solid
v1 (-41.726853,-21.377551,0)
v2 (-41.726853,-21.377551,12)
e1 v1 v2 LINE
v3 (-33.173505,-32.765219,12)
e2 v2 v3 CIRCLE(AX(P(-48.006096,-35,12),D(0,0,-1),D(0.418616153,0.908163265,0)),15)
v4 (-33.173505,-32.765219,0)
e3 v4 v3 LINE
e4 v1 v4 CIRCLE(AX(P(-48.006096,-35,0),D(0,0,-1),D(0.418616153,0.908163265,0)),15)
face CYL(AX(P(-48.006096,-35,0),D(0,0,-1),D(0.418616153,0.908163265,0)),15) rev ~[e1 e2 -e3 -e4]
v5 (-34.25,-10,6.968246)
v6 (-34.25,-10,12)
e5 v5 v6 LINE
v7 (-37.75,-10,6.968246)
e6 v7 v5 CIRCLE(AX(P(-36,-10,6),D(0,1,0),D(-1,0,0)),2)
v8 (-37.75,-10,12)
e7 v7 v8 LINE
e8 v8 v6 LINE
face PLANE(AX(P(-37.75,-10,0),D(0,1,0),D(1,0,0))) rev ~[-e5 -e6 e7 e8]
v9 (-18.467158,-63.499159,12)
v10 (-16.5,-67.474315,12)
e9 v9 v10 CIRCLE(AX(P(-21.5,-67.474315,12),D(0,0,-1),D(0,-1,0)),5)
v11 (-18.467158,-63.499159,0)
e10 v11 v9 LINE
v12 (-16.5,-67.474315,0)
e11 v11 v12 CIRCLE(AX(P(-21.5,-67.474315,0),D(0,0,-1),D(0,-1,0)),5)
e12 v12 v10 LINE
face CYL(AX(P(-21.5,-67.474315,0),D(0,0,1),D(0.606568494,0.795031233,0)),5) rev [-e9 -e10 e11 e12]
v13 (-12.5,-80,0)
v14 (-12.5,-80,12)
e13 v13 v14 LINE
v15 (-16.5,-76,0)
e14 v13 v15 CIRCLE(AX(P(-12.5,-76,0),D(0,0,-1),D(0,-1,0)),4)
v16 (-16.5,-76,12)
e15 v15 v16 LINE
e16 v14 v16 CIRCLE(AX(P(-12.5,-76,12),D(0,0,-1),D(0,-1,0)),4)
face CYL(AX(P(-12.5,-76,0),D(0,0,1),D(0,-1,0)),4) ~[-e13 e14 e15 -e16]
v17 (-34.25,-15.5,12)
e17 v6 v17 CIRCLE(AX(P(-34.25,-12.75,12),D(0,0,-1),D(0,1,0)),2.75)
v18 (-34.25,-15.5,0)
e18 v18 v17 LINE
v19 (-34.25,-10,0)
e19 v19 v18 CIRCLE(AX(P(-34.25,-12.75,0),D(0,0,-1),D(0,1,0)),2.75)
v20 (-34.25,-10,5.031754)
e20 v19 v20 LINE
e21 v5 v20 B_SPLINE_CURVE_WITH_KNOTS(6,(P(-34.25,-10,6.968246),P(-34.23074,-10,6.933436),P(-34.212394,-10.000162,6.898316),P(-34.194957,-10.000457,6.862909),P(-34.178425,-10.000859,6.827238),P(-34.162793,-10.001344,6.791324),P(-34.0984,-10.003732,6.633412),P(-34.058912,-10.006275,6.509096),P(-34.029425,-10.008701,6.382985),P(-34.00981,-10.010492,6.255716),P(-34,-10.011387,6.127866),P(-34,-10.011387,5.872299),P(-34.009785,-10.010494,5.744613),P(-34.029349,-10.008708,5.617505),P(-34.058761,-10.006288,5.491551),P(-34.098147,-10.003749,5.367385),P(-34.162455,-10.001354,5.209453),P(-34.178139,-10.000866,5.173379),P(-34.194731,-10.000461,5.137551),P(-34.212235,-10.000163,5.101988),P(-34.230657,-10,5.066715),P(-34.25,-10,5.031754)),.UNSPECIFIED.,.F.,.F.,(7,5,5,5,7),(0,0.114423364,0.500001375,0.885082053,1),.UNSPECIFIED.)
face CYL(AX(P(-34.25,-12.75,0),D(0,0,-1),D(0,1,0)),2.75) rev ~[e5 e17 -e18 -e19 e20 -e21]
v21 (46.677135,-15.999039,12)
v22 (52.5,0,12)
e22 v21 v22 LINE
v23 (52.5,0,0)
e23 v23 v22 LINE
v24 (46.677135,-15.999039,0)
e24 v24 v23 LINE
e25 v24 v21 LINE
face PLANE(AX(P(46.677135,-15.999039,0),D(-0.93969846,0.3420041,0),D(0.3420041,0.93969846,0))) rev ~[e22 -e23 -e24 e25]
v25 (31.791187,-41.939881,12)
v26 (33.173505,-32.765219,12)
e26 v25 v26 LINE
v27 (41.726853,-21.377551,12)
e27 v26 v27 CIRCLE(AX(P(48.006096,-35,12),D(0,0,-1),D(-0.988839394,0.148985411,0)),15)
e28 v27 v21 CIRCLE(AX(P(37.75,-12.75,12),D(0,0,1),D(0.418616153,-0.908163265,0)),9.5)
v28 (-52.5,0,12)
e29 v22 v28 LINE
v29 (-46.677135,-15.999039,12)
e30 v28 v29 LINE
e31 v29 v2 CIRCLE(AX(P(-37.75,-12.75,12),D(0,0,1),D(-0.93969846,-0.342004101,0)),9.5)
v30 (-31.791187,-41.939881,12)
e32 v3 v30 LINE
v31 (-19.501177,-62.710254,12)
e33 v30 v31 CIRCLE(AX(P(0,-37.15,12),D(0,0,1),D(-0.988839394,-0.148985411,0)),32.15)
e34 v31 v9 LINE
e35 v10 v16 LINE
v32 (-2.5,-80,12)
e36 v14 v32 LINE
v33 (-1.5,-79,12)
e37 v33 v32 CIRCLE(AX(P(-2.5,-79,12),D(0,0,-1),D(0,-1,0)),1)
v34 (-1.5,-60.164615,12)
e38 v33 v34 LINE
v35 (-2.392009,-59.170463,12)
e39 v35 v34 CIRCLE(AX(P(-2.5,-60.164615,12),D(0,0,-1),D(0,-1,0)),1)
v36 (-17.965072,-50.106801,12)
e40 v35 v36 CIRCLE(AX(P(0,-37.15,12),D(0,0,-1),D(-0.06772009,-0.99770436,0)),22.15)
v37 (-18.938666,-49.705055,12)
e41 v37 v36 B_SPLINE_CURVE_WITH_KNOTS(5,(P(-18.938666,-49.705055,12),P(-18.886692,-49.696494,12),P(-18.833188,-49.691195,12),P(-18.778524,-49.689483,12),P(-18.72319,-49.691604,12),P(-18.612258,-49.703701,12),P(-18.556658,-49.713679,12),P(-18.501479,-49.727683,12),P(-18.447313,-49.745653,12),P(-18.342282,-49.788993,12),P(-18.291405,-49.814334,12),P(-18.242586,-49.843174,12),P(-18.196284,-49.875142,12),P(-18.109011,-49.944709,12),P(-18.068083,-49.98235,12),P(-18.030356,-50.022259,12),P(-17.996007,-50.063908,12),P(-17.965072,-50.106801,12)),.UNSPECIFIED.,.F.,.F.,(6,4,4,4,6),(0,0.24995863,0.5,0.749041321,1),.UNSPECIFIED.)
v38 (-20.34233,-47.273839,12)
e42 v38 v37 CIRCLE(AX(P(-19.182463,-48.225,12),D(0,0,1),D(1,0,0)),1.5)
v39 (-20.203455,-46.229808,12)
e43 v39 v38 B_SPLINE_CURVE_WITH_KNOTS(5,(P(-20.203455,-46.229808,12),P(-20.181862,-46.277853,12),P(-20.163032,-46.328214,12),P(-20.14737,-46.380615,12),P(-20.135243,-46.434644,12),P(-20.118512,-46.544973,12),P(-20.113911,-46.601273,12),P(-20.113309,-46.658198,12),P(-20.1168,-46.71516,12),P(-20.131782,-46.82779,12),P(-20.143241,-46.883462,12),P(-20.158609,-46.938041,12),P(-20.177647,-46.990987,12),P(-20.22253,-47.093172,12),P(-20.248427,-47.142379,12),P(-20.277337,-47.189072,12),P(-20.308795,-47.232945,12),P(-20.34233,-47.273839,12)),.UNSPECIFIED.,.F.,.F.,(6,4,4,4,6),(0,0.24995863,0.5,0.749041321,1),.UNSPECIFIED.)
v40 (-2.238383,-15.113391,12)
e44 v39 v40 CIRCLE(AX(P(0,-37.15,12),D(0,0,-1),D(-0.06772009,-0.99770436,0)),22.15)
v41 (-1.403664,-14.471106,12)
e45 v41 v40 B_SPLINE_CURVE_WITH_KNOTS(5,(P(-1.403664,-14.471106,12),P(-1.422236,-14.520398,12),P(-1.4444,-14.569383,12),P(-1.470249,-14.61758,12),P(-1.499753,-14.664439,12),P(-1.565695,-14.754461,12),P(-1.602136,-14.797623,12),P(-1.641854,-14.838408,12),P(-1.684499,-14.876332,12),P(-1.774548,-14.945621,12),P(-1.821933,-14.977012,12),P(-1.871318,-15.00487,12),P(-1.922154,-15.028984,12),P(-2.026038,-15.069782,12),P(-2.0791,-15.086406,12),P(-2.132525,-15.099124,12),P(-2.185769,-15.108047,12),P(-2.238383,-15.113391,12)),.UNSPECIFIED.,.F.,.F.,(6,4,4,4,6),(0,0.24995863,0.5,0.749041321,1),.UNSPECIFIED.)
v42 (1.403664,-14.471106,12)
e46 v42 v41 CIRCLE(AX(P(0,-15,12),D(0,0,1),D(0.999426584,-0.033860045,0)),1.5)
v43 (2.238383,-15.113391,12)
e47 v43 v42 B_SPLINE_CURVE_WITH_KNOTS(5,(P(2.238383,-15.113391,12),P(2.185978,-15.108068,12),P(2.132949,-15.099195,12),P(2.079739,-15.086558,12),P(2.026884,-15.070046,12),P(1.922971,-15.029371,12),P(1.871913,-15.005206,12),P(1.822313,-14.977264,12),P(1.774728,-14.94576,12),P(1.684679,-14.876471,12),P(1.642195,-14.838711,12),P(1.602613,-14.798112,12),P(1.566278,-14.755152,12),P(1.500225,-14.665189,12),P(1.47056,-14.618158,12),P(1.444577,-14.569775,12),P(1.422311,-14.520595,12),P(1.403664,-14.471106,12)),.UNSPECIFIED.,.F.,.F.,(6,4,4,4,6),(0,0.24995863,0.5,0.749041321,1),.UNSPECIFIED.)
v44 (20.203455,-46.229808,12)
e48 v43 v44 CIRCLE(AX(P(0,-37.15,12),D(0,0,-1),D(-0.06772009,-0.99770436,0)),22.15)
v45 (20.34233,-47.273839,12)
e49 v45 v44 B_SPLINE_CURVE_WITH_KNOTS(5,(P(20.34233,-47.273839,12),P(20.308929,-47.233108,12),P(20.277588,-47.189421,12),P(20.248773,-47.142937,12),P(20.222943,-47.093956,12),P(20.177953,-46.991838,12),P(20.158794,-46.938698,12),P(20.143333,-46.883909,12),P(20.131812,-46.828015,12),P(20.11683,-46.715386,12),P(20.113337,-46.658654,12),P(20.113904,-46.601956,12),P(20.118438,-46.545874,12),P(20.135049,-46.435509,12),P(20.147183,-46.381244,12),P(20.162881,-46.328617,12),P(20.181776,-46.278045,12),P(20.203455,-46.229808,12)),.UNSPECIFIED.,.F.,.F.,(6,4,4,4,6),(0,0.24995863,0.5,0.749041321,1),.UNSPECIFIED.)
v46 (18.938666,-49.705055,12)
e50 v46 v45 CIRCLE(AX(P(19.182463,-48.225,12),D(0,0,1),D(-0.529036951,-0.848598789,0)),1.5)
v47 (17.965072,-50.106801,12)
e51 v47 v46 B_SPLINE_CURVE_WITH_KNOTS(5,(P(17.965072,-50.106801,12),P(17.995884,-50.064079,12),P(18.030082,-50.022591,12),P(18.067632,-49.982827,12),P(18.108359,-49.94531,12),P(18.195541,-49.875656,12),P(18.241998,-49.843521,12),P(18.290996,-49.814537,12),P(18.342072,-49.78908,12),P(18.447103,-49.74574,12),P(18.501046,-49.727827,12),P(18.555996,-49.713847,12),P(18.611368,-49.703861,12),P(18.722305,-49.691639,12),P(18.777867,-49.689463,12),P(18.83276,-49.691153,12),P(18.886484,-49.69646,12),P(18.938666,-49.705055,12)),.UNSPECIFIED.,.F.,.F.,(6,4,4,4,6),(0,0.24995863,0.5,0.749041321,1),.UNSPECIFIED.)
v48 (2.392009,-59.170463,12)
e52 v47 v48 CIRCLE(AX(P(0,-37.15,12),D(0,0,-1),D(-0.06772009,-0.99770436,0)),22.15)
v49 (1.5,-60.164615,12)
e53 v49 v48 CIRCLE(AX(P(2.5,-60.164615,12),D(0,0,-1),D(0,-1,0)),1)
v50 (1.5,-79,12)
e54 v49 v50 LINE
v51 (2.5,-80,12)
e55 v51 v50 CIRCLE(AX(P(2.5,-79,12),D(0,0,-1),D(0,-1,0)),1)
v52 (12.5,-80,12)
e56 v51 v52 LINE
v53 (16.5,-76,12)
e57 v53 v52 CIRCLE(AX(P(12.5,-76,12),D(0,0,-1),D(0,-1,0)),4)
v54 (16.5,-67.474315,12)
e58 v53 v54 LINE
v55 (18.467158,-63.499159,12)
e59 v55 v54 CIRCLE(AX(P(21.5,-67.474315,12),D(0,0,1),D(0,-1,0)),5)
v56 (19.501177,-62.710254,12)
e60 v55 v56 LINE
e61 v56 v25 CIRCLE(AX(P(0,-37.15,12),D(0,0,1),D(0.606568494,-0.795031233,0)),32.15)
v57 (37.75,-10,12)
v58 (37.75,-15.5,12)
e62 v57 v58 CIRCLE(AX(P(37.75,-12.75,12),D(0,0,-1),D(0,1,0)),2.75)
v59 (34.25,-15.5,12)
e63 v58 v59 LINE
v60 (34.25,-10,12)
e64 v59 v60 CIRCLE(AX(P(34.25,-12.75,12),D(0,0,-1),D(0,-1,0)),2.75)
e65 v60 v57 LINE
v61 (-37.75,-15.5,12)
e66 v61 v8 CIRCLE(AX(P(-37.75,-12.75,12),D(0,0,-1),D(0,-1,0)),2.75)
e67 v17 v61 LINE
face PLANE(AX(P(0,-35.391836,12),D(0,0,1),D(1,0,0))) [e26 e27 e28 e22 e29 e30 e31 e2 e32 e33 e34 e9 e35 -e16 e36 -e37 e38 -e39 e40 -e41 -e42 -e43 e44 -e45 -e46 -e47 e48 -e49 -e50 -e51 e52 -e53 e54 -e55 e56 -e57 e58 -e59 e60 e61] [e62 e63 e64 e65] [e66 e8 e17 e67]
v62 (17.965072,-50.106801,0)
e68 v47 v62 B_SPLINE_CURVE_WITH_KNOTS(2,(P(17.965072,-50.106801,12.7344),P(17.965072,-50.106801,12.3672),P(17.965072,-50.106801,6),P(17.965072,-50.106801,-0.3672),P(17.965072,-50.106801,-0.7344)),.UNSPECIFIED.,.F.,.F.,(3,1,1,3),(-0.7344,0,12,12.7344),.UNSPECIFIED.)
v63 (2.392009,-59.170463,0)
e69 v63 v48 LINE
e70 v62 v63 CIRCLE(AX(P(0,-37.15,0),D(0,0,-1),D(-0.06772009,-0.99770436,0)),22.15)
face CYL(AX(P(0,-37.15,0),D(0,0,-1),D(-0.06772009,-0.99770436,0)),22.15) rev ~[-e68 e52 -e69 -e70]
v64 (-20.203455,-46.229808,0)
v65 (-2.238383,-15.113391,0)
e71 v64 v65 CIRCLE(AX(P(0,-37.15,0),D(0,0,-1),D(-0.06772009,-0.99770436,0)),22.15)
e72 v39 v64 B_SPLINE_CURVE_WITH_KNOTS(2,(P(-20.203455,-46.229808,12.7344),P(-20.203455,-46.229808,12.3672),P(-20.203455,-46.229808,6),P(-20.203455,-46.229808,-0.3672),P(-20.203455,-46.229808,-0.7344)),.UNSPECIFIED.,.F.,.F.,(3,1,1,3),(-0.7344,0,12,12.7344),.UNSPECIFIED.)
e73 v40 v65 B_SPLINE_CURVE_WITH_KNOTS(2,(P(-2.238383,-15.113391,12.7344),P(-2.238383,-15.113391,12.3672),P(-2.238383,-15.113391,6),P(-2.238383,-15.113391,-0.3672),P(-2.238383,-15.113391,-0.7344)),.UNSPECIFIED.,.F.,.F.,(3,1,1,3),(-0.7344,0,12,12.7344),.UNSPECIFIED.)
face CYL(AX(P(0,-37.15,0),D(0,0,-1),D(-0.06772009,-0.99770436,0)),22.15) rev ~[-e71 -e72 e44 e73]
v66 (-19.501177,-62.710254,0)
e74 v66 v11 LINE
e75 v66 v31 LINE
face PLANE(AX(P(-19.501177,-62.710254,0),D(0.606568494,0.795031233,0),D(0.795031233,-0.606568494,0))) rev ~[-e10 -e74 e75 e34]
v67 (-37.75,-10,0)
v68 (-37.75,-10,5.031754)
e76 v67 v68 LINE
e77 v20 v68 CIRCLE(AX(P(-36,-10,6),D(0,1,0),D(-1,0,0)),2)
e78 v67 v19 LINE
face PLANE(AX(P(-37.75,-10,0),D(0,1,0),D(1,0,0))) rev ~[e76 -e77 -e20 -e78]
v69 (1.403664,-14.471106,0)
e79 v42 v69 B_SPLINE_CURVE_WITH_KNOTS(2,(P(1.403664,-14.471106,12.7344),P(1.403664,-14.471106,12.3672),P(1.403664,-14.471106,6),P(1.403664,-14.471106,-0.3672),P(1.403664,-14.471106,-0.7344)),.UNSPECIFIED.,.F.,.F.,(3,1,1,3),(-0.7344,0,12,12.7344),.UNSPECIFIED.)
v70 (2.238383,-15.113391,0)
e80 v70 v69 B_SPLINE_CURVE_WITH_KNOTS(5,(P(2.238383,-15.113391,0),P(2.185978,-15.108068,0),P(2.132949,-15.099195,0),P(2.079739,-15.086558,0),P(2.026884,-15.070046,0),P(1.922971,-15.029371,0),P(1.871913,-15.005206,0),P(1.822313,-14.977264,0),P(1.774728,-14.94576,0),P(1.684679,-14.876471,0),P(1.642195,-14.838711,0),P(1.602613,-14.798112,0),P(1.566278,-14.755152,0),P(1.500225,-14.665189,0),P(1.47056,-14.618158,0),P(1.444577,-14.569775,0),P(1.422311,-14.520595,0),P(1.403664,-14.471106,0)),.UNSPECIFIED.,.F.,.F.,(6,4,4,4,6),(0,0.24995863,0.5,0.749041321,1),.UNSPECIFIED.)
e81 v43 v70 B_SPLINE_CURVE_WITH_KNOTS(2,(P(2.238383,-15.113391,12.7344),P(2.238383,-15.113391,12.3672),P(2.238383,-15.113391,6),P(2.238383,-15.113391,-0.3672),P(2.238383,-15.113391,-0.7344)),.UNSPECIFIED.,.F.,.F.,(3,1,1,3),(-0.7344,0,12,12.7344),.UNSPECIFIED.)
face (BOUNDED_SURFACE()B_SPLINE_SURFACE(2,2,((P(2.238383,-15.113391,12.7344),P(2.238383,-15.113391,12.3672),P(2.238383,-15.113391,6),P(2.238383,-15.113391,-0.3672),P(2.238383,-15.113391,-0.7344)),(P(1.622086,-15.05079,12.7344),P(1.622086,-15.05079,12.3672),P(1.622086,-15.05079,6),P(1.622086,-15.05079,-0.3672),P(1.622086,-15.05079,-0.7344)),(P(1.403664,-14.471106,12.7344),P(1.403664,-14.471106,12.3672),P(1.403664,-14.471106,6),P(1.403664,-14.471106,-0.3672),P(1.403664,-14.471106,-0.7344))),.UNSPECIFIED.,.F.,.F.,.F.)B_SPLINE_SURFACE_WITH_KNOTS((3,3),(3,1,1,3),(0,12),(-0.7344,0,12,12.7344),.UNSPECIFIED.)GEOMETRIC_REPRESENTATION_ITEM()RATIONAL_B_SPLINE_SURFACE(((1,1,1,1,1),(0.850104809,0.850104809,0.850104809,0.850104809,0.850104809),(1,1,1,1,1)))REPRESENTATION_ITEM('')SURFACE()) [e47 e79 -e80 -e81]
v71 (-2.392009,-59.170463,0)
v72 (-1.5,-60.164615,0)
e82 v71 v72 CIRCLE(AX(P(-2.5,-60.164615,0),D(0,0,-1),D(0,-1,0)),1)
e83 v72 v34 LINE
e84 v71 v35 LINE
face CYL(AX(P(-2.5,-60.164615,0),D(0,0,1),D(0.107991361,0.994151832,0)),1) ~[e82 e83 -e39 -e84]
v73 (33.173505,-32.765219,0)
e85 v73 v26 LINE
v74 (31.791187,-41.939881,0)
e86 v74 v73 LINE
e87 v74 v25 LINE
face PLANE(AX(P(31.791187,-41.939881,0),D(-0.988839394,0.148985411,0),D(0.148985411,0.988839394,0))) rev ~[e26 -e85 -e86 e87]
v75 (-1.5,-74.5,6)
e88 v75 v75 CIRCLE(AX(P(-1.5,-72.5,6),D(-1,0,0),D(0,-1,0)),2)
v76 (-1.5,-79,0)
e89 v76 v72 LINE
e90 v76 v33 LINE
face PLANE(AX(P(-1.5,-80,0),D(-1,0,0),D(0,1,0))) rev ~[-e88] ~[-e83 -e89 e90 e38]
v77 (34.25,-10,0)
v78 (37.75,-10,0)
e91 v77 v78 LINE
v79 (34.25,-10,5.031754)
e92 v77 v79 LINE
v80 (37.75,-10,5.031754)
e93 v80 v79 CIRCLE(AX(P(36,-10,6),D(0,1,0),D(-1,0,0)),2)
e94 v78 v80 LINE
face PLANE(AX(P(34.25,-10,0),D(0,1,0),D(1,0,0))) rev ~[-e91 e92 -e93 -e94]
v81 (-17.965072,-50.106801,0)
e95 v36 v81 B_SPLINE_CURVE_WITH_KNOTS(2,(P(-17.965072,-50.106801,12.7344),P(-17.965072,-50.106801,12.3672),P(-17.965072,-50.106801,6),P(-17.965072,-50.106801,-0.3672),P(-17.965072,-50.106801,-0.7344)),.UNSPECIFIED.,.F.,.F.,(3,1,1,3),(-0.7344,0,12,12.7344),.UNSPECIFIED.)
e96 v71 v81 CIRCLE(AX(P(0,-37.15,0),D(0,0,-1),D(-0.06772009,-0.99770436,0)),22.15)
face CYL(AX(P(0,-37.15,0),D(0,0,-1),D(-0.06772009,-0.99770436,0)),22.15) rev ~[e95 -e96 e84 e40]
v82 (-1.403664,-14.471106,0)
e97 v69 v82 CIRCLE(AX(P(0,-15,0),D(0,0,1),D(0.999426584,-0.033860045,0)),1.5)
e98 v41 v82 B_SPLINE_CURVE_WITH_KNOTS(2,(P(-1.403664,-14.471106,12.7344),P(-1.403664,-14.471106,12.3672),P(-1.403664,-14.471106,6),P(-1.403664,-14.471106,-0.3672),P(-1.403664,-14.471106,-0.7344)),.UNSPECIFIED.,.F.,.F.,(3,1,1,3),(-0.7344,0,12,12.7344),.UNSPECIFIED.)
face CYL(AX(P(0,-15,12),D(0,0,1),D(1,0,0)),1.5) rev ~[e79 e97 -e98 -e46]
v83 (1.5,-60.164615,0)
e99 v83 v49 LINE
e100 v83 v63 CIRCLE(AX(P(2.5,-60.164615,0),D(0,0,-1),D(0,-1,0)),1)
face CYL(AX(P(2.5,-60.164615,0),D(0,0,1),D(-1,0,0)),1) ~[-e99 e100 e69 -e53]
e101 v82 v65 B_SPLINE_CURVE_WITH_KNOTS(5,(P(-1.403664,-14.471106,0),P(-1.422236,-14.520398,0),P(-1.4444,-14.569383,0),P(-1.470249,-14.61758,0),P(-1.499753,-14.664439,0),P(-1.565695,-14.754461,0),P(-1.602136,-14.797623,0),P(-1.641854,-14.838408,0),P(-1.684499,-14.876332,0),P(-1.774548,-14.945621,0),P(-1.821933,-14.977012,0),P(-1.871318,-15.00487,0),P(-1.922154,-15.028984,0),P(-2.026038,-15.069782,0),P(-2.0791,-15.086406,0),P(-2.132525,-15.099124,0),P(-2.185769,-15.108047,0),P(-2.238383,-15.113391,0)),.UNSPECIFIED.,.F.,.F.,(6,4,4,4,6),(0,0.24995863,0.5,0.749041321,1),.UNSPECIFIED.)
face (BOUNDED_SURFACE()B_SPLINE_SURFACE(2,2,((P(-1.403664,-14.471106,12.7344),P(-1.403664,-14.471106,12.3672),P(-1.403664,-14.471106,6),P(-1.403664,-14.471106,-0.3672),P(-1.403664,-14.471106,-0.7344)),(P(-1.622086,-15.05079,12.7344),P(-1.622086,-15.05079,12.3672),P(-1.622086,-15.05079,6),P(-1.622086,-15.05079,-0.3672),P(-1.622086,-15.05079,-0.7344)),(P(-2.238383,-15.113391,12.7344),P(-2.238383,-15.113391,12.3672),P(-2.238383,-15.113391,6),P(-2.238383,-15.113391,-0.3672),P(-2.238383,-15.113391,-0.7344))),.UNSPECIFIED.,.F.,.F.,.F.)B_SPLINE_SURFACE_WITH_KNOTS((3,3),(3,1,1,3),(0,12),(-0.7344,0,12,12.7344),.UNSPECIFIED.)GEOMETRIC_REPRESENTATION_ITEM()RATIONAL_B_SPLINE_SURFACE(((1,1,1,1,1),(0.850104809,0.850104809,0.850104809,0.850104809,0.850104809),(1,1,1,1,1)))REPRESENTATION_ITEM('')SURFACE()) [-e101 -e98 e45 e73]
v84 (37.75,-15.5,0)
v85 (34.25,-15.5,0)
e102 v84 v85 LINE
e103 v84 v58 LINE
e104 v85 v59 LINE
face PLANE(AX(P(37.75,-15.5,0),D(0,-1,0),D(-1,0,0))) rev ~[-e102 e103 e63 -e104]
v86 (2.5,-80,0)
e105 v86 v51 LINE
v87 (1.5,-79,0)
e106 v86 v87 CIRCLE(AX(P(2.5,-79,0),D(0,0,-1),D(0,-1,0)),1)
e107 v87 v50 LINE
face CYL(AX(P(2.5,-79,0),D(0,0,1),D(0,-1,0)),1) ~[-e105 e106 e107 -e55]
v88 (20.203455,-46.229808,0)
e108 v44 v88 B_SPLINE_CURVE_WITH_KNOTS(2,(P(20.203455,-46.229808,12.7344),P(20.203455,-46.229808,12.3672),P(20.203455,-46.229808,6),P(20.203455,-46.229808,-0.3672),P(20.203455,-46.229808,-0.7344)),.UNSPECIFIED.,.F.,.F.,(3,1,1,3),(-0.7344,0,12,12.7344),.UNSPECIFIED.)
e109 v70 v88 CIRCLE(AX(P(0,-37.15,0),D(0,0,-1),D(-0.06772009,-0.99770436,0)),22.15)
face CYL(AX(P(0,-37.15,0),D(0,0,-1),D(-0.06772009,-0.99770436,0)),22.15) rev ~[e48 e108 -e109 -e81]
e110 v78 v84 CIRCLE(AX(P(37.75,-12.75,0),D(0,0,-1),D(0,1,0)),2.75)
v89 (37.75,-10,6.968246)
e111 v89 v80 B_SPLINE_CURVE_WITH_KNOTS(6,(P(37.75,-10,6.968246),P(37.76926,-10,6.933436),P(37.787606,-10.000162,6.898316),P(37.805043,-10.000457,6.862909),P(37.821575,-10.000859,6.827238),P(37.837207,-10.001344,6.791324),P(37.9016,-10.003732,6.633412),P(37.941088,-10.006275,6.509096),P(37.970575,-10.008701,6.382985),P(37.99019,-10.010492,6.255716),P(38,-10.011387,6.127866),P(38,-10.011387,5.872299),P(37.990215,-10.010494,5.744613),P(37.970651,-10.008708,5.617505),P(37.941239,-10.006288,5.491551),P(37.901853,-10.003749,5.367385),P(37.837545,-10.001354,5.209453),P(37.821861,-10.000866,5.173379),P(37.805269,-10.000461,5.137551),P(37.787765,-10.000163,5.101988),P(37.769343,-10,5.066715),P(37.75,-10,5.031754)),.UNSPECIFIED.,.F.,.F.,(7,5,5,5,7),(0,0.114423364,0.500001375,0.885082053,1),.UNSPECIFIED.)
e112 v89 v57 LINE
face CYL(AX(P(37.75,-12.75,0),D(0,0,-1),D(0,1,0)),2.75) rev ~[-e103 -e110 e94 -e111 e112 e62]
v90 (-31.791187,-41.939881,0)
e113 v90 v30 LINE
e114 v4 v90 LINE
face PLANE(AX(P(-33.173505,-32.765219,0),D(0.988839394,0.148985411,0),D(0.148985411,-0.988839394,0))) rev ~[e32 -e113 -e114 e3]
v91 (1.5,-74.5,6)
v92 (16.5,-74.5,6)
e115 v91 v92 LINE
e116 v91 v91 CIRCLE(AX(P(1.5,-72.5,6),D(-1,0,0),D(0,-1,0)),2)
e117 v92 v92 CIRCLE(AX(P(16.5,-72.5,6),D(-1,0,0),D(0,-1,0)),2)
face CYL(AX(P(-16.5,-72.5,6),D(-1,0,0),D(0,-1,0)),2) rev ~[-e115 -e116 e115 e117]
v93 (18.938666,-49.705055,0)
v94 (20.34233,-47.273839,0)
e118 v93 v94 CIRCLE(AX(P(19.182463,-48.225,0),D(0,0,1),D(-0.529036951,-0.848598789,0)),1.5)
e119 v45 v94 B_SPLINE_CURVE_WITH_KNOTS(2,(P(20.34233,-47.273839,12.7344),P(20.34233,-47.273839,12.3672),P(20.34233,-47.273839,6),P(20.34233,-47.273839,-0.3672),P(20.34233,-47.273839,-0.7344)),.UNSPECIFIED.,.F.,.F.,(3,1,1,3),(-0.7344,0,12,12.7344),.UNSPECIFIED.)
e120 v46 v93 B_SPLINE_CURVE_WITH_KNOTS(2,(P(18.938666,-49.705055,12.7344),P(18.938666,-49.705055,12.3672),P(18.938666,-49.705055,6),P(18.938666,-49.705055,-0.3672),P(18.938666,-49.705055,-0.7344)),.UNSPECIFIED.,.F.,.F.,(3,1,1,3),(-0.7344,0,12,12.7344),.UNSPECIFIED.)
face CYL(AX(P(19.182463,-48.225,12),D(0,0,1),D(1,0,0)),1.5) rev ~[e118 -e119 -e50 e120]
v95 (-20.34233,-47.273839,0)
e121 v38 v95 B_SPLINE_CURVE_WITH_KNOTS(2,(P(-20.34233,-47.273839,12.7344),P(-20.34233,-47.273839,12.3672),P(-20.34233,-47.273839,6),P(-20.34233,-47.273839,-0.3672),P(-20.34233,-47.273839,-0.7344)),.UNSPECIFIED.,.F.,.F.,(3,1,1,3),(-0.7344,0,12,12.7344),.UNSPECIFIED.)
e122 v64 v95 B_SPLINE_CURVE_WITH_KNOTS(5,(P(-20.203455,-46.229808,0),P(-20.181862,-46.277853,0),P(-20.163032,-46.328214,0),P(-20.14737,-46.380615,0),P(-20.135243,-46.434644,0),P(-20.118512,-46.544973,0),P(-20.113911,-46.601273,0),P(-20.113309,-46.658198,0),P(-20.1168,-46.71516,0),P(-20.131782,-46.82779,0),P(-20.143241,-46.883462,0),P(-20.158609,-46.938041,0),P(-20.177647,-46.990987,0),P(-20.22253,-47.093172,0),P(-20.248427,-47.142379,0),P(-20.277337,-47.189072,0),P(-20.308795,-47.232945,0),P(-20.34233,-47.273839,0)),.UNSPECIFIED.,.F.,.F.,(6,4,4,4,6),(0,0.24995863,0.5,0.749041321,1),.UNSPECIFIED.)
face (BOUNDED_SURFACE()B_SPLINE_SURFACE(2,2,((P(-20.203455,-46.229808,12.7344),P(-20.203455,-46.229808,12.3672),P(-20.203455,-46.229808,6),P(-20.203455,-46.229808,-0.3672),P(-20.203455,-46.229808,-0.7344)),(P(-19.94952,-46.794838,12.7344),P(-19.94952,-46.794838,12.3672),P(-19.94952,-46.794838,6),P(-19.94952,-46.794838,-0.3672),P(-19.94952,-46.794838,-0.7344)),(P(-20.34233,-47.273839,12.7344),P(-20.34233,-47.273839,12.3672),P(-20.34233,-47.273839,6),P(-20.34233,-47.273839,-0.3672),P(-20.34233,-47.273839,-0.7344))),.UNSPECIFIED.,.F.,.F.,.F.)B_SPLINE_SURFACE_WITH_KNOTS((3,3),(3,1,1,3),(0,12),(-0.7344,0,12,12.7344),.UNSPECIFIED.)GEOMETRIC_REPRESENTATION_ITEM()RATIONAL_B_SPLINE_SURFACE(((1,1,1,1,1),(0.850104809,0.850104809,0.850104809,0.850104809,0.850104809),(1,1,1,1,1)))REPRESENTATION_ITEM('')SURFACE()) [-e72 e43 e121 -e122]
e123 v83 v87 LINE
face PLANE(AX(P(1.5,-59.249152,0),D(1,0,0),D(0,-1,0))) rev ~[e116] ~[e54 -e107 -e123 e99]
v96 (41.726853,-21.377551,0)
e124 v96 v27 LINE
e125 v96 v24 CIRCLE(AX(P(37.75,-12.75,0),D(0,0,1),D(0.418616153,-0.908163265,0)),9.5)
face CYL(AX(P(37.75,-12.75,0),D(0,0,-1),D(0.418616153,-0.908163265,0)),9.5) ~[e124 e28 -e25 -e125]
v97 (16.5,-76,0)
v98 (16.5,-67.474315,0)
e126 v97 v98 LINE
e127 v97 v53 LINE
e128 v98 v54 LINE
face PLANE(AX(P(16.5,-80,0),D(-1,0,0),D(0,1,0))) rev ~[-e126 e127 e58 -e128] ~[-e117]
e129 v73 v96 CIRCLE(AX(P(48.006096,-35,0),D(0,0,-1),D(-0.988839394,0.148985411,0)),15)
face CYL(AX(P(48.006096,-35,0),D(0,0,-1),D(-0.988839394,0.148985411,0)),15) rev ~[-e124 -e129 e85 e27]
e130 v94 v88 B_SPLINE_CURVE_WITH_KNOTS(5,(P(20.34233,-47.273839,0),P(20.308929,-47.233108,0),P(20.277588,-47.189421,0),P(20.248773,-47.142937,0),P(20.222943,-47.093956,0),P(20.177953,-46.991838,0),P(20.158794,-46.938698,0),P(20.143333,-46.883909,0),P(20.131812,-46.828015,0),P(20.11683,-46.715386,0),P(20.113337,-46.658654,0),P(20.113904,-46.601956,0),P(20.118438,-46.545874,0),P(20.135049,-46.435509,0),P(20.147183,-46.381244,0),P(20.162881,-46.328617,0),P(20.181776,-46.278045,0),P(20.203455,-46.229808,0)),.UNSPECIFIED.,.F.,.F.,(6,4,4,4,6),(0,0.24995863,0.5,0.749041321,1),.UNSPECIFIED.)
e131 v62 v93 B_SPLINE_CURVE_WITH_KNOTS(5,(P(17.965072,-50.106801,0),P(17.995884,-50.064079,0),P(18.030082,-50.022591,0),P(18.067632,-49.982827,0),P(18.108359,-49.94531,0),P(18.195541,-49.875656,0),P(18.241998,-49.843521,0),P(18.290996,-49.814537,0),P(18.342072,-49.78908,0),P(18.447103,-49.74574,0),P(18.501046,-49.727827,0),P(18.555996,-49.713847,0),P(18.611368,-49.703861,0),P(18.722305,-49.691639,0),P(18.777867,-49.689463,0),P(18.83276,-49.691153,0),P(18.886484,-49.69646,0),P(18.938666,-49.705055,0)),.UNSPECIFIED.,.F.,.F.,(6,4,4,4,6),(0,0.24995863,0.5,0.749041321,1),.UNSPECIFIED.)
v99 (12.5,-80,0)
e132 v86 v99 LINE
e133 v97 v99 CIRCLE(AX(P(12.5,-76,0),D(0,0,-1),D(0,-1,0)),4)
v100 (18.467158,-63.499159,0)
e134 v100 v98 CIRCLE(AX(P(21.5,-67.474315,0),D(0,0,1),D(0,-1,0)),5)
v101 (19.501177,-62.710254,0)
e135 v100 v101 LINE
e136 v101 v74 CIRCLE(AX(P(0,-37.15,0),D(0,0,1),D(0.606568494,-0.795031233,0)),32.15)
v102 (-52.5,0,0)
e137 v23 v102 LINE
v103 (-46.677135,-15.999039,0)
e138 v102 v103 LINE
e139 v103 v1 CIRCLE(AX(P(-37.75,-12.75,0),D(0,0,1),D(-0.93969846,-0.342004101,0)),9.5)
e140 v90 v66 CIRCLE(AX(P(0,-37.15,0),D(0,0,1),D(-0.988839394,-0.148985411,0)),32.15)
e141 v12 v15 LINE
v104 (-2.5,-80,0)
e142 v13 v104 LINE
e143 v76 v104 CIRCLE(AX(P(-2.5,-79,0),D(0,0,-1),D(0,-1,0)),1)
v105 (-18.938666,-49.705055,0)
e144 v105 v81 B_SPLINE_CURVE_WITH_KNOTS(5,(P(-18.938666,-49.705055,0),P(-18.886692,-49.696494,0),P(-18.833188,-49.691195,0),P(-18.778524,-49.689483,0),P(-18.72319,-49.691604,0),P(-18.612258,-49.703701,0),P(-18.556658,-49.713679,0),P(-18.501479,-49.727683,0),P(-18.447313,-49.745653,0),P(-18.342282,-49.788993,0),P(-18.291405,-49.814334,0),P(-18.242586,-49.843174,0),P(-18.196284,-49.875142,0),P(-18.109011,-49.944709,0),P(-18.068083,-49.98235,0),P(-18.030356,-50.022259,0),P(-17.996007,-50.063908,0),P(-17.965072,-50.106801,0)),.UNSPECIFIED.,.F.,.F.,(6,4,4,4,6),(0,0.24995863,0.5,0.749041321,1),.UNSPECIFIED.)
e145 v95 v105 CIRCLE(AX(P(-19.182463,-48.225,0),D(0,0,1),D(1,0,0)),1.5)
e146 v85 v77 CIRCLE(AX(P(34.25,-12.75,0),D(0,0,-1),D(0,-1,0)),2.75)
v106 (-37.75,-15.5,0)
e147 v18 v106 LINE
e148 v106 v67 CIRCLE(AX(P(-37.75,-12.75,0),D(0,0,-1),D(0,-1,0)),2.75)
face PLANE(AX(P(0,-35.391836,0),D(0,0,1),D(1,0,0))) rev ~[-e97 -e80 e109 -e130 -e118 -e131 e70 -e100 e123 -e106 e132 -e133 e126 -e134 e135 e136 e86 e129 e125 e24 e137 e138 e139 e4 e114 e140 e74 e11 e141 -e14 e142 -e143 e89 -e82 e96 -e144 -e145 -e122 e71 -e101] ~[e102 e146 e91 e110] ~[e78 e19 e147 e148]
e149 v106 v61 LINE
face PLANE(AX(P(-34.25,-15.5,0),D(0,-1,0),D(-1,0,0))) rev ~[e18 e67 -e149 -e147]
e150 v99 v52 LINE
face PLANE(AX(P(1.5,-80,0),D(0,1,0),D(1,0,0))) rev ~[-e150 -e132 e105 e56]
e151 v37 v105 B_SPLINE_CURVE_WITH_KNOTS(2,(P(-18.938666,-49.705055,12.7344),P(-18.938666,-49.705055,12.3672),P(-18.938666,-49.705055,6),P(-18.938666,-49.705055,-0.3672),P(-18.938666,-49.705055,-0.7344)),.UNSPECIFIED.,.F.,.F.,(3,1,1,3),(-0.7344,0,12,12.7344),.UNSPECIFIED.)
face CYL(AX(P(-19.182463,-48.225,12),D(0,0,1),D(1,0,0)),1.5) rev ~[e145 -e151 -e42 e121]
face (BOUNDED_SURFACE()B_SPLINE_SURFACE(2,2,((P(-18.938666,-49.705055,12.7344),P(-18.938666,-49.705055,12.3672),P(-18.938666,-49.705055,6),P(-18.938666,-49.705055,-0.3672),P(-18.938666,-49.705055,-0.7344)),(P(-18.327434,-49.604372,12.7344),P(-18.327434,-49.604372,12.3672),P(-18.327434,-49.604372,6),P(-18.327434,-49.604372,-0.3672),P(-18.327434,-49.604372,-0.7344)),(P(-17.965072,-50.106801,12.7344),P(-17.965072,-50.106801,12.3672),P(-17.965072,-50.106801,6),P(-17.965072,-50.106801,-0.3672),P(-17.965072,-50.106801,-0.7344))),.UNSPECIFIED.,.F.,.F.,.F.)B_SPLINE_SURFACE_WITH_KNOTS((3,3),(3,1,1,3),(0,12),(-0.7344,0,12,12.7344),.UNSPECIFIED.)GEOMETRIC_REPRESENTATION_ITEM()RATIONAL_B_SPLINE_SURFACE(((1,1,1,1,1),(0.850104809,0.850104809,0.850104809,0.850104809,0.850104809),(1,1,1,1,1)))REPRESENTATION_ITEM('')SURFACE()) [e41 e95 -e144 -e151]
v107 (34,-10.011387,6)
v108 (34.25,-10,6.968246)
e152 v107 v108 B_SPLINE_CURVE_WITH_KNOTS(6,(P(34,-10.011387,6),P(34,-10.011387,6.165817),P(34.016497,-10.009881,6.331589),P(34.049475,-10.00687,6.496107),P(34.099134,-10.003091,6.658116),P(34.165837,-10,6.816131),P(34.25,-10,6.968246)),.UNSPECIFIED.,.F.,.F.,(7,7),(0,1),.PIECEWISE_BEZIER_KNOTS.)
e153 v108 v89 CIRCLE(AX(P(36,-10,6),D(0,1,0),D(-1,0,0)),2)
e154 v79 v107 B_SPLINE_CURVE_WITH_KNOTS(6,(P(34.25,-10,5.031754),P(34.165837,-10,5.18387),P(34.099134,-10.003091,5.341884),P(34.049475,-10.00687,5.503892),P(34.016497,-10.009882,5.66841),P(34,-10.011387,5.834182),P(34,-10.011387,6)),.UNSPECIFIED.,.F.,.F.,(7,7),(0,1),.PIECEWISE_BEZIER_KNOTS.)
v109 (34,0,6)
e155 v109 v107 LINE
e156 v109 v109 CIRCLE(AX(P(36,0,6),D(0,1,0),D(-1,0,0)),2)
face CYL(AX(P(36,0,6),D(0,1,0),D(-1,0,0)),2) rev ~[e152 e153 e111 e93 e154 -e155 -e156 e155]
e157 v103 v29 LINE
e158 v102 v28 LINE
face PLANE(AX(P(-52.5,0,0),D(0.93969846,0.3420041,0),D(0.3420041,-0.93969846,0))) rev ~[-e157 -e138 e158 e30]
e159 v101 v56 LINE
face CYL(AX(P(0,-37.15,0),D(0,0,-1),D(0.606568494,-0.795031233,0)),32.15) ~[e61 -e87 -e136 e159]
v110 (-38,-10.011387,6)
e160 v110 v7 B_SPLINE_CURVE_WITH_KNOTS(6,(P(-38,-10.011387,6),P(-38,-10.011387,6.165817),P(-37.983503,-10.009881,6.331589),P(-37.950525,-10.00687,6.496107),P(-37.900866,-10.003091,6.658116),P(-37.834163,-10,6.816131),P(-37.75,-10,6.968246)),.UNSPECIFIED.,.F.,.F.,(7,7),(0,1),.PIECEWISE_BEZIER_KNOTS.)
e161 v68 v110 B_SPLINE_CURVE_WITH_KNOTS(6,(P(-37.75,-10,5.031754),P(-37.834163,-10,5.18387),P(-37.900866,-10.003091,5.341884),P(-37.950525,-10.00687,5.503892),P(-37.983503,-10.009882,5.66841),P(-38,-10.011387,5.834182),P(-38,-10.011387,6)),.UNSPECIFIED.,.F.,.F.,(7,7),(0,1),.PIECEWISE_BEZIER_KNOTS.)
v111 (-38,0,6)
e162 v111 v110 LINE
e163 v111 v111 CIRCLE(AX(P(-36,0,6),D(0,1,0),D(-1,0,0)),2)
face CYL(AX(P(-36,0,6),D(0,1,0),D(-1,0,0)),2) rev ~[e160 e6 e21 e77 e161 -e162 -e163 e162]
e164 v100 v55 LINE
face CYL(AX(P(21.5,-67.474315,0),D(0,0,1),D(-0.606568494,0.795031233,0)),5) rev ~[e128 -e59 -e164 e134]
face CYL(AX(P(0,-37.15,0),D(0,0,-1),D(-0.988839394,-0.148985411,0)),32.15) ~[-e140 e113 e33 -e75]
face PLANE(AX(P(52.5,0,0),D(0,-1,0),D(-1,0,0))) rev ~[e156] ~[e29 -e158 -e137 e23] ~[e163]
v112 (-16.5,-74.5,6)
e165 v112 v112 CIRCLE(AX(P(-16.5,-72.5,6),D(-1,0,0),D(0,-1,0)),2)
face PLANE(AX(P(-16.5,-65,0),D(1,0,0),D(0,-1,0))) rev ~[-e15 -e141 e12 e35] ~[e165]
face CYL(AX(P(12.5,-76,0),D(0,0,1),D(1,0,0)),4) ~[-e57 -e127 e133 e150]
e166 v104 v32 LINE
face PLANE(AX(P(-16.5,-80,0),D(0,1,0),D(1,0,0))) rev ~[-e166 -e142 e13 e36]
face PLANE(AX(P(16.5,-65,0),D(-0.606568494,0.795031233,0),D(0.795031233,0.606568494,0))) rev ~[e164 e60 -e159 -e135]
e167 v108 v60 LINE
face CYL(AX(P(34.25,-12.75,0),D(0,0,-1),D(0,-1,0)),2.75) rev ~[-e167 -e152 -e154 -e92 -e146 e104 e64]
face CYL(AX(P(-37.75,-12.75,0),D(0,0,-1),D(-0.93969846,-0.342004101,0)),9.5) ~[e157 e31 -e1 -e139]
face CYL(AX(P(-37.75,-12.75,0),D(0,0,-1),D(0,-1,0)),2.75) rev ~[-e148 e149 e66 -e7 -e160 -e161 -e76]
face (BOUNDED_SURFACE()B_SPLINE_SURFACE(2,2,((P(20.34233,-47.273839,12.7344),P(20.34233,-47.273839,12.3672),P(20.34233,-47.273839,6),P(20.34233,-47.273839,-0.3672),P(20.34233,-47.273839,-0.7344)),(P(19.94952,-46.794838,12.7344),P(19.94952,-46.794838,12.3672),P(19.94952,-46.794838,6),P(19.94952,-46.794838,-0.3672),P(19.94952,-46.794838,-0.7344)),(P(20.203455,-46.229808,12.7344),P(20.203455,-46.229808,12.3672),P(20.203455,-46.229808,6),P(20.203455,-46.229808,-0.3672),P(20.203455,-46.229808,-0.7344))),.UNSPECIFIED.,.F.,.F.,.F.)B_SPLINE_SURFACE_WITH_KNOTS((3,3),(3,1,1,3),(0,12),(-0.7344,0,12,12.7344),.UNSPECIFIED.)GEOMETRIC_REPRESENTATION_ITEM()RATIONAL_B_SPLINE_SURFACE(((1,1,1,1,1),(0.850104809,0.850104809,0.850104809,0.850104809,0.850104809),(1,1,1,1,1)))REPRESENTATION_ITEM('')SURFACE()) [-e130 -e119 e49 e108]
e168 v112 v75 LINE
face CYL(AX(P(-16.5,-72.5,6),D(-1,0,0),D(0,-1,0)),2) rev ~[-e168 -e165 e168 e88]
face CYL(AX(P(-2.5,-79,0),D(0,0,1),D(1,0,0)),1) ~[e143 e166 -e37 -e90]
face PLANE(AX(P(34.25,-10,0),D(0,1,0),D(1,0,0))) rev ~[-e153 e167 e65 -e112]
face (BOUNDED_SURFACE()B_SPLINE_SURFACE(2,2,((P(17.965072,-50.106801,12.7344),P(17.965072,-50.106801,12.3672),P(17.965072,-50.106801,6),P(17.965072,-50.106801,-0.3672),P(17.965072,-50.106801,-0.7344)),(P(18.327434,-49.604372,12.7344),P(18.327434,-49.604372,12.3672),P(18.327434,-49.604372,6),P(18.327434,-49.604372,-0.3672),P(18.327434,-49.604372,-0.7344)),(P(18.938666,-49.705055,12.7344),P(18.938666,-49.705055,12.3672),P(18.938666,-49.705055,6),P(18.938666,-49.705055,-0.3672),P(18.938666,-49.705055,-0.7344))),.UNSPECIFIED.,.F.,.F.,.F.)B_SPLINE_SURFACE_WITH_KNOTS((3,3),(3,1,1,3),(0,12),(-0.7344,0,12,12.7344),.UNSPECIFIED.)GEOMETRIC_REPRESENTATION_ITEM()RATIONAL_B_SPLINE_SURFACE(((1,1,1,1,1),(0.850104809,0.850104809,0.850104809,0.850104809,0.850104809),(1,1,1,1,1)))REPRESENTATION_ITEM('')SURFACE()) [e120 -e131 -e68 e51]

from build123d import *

# Parameters (mm, degrees)
F1_DEPTH = 12
F2_R     = 5
F3_R     = 2
F4_DEPTH = 69.001
F5_R     = 4
F6_R     = 2
F7_DEPTH = 12
F8_R     = 1.5
F9_DEPTH = 25
F10_R    = 1


with BuildPart() as f1:
    # F0 (on Top) → F1 (new body)
    with BuildSketch(Plane.XY):
        with BuildLine():
            Line((52.5, 0), (-52.5, 0))
            Line((-52.5, 0), (-46.6771353676, -15.9990389547))
            ThreePointArc((-46.6771353676, -15.9990389547), (-44.7400164437, -19.1834804046), (-41.7268534535, -21.3775510204))
            ThreePointArc((-41.7268534535, -21.3775510204), (-36.0124674438, -25.9915106654), (-33.1735048367, -32.7652188367))
            Line((-33.1735048367, -32.7652188367), (-31.7911865206, -41.93988096))
            ThreePointArc((-31.7911865206, -41.93988096), (-27.6690936208, -53.5220419681), (-19.5011770908, -62.7102541473))
            Line((-19.5011770908, -62.7102541473), (-16.5, -65))
            Line((-16.5, -65), (-16.5, -80))
            Line((-16.5, -80), (-1.5, -80))
            Line((-1.5, -80), (-1.5, -59.2491515674))
            ThreePointArc((-1.5, -59.2491515674), (0, -15), (1.5, -59.2491515674))
            Line((1.5, -59.2491515674), (1.5, -80))
            Line((1.5, -80), (16.5, -80))
            Line((16.5, -80), (16.5, -65))
            Line((16.5, -65), (19.5011770908, -62.7102541473))
            ThreePointArc((19.5011770908, -62.7102541473), (27.6690936208, -53.5220419681), (31.7911865206, -41.93988096))
            Line((31.7911865206, -41.93988096), (33.1735048367, -32.7652188367))
            ThreePointArc((33.1735048367, -32.7652188367), (36.0124674438, -25.9915106654), (41.7268534535, -21.3775510204))
            ThreePointArc((41.7268534535, -21.3775510204), (44.7400164437, -19.1834804046), (46.6771353676, -15.9990389547))
            Line((46.6771353676, -15.9990389547), (52.5, 0))
        make_face()
        with BuildLine():
            Line((-34.25, -15.5), (-37.75, -15.5))
            ThreePointArc((-37.75, -15.5), (-40.5, -12.75), (-37.75, -10))
            Line((-37.75, -10), (-34.25, -10))
            ThreePointArc((-34.25, -10), (-31.5, -12.75), (-34.25, -15.5))
        make_face(mode=Mode.SUBTRACT)
        with BuildLine():
            ThreePointArc((37.75, -10), (40.5, -12.75), (37.75, -15.5))
            Line((37.75, -15.5), (34.25, -15.5))
            ThreePointArc((34.25, -15.5), (31.5, -12.75), (34.25, -10))
            Line((34.25, -10), (37.75, -10))
        make_face(mode=Mode.SUBTRACT)
    extrude(amount=F1_DEPTH)

    # F2
    f2_edges = [f1.edges().sort_by_distance(p)[0] for p in [
        (-16.5, -65, 6),
        (16.5, -65, 6),
    ]]
    fillet(f2_edges, radius=F2_R)

    # F3 (on face) → F4 (cut, through all)
    with BuildSketch(Plane(origin=(-16.5, 0, 0), x_dir=(0, -1, 0), z_dir=(-1, 0, 0))):
        with Locations((72.5, 6)):
            Circle(F3_R)
    extrude(amount=-F4_DEPTH, mode=Mode.SUBTRACT)

    # F5
    f5_edges = [f1.edges().sort_by_distance(p)[0] for p in [
        (-16.5, -80, 6),
        (16.5, -80, 6),
    ]]
    fillet(f5_edges, radius=F5_R)

    # F6 (on face) → F7 (cut)
    with BuildSketch(Plane(origin=(0, 0, 0), x_dir=(-1, 0, 0), z_dir=(0, 1, 0))):
        with Locations((-36, 6)):
            Circle(F6_R)
        with Locations((36, 6)):
            Circle(F6_R)
    extrude(amount=-F7_DEPTH, mode=Mode.SUBTRACT)

    # F8 (on face) → F9 (cut)
    with BuildSketch(Plane.XY.offset(12)):
        with Locations((0, -15)):
            Circle(F8_R)
        with Locations((-19.1824626938, -48.225)):
            Circle(F8_R)
        with Locations((19.1824626938, -48.225)):
            Circle(F8_R)
    extrude(amount=-F9_DEPTH, mode=Mode.SUBTRACT)

    # F10
    f10_edges = [f1.edges().sort_by_distance(p)[0] for p in [
        (1.49914, -15.05079, 6),
        (-1.49914, -15.05079, 6),
        (-19.888047, -46.901312, 6),
        (-18.388907, -49.497898, 6),
        (18.388907, -49.497898, 6),
        (19.888047, -46.901312, 6),
        (1.5, -59.249152, 6),
        (-1.5, -59.249152, 6),
        (1.5, -80, 6),
        (-1.5, -80, 6),
    ]]
    fillet(f10_edges, radius=F10_R)


solid = f1.part
